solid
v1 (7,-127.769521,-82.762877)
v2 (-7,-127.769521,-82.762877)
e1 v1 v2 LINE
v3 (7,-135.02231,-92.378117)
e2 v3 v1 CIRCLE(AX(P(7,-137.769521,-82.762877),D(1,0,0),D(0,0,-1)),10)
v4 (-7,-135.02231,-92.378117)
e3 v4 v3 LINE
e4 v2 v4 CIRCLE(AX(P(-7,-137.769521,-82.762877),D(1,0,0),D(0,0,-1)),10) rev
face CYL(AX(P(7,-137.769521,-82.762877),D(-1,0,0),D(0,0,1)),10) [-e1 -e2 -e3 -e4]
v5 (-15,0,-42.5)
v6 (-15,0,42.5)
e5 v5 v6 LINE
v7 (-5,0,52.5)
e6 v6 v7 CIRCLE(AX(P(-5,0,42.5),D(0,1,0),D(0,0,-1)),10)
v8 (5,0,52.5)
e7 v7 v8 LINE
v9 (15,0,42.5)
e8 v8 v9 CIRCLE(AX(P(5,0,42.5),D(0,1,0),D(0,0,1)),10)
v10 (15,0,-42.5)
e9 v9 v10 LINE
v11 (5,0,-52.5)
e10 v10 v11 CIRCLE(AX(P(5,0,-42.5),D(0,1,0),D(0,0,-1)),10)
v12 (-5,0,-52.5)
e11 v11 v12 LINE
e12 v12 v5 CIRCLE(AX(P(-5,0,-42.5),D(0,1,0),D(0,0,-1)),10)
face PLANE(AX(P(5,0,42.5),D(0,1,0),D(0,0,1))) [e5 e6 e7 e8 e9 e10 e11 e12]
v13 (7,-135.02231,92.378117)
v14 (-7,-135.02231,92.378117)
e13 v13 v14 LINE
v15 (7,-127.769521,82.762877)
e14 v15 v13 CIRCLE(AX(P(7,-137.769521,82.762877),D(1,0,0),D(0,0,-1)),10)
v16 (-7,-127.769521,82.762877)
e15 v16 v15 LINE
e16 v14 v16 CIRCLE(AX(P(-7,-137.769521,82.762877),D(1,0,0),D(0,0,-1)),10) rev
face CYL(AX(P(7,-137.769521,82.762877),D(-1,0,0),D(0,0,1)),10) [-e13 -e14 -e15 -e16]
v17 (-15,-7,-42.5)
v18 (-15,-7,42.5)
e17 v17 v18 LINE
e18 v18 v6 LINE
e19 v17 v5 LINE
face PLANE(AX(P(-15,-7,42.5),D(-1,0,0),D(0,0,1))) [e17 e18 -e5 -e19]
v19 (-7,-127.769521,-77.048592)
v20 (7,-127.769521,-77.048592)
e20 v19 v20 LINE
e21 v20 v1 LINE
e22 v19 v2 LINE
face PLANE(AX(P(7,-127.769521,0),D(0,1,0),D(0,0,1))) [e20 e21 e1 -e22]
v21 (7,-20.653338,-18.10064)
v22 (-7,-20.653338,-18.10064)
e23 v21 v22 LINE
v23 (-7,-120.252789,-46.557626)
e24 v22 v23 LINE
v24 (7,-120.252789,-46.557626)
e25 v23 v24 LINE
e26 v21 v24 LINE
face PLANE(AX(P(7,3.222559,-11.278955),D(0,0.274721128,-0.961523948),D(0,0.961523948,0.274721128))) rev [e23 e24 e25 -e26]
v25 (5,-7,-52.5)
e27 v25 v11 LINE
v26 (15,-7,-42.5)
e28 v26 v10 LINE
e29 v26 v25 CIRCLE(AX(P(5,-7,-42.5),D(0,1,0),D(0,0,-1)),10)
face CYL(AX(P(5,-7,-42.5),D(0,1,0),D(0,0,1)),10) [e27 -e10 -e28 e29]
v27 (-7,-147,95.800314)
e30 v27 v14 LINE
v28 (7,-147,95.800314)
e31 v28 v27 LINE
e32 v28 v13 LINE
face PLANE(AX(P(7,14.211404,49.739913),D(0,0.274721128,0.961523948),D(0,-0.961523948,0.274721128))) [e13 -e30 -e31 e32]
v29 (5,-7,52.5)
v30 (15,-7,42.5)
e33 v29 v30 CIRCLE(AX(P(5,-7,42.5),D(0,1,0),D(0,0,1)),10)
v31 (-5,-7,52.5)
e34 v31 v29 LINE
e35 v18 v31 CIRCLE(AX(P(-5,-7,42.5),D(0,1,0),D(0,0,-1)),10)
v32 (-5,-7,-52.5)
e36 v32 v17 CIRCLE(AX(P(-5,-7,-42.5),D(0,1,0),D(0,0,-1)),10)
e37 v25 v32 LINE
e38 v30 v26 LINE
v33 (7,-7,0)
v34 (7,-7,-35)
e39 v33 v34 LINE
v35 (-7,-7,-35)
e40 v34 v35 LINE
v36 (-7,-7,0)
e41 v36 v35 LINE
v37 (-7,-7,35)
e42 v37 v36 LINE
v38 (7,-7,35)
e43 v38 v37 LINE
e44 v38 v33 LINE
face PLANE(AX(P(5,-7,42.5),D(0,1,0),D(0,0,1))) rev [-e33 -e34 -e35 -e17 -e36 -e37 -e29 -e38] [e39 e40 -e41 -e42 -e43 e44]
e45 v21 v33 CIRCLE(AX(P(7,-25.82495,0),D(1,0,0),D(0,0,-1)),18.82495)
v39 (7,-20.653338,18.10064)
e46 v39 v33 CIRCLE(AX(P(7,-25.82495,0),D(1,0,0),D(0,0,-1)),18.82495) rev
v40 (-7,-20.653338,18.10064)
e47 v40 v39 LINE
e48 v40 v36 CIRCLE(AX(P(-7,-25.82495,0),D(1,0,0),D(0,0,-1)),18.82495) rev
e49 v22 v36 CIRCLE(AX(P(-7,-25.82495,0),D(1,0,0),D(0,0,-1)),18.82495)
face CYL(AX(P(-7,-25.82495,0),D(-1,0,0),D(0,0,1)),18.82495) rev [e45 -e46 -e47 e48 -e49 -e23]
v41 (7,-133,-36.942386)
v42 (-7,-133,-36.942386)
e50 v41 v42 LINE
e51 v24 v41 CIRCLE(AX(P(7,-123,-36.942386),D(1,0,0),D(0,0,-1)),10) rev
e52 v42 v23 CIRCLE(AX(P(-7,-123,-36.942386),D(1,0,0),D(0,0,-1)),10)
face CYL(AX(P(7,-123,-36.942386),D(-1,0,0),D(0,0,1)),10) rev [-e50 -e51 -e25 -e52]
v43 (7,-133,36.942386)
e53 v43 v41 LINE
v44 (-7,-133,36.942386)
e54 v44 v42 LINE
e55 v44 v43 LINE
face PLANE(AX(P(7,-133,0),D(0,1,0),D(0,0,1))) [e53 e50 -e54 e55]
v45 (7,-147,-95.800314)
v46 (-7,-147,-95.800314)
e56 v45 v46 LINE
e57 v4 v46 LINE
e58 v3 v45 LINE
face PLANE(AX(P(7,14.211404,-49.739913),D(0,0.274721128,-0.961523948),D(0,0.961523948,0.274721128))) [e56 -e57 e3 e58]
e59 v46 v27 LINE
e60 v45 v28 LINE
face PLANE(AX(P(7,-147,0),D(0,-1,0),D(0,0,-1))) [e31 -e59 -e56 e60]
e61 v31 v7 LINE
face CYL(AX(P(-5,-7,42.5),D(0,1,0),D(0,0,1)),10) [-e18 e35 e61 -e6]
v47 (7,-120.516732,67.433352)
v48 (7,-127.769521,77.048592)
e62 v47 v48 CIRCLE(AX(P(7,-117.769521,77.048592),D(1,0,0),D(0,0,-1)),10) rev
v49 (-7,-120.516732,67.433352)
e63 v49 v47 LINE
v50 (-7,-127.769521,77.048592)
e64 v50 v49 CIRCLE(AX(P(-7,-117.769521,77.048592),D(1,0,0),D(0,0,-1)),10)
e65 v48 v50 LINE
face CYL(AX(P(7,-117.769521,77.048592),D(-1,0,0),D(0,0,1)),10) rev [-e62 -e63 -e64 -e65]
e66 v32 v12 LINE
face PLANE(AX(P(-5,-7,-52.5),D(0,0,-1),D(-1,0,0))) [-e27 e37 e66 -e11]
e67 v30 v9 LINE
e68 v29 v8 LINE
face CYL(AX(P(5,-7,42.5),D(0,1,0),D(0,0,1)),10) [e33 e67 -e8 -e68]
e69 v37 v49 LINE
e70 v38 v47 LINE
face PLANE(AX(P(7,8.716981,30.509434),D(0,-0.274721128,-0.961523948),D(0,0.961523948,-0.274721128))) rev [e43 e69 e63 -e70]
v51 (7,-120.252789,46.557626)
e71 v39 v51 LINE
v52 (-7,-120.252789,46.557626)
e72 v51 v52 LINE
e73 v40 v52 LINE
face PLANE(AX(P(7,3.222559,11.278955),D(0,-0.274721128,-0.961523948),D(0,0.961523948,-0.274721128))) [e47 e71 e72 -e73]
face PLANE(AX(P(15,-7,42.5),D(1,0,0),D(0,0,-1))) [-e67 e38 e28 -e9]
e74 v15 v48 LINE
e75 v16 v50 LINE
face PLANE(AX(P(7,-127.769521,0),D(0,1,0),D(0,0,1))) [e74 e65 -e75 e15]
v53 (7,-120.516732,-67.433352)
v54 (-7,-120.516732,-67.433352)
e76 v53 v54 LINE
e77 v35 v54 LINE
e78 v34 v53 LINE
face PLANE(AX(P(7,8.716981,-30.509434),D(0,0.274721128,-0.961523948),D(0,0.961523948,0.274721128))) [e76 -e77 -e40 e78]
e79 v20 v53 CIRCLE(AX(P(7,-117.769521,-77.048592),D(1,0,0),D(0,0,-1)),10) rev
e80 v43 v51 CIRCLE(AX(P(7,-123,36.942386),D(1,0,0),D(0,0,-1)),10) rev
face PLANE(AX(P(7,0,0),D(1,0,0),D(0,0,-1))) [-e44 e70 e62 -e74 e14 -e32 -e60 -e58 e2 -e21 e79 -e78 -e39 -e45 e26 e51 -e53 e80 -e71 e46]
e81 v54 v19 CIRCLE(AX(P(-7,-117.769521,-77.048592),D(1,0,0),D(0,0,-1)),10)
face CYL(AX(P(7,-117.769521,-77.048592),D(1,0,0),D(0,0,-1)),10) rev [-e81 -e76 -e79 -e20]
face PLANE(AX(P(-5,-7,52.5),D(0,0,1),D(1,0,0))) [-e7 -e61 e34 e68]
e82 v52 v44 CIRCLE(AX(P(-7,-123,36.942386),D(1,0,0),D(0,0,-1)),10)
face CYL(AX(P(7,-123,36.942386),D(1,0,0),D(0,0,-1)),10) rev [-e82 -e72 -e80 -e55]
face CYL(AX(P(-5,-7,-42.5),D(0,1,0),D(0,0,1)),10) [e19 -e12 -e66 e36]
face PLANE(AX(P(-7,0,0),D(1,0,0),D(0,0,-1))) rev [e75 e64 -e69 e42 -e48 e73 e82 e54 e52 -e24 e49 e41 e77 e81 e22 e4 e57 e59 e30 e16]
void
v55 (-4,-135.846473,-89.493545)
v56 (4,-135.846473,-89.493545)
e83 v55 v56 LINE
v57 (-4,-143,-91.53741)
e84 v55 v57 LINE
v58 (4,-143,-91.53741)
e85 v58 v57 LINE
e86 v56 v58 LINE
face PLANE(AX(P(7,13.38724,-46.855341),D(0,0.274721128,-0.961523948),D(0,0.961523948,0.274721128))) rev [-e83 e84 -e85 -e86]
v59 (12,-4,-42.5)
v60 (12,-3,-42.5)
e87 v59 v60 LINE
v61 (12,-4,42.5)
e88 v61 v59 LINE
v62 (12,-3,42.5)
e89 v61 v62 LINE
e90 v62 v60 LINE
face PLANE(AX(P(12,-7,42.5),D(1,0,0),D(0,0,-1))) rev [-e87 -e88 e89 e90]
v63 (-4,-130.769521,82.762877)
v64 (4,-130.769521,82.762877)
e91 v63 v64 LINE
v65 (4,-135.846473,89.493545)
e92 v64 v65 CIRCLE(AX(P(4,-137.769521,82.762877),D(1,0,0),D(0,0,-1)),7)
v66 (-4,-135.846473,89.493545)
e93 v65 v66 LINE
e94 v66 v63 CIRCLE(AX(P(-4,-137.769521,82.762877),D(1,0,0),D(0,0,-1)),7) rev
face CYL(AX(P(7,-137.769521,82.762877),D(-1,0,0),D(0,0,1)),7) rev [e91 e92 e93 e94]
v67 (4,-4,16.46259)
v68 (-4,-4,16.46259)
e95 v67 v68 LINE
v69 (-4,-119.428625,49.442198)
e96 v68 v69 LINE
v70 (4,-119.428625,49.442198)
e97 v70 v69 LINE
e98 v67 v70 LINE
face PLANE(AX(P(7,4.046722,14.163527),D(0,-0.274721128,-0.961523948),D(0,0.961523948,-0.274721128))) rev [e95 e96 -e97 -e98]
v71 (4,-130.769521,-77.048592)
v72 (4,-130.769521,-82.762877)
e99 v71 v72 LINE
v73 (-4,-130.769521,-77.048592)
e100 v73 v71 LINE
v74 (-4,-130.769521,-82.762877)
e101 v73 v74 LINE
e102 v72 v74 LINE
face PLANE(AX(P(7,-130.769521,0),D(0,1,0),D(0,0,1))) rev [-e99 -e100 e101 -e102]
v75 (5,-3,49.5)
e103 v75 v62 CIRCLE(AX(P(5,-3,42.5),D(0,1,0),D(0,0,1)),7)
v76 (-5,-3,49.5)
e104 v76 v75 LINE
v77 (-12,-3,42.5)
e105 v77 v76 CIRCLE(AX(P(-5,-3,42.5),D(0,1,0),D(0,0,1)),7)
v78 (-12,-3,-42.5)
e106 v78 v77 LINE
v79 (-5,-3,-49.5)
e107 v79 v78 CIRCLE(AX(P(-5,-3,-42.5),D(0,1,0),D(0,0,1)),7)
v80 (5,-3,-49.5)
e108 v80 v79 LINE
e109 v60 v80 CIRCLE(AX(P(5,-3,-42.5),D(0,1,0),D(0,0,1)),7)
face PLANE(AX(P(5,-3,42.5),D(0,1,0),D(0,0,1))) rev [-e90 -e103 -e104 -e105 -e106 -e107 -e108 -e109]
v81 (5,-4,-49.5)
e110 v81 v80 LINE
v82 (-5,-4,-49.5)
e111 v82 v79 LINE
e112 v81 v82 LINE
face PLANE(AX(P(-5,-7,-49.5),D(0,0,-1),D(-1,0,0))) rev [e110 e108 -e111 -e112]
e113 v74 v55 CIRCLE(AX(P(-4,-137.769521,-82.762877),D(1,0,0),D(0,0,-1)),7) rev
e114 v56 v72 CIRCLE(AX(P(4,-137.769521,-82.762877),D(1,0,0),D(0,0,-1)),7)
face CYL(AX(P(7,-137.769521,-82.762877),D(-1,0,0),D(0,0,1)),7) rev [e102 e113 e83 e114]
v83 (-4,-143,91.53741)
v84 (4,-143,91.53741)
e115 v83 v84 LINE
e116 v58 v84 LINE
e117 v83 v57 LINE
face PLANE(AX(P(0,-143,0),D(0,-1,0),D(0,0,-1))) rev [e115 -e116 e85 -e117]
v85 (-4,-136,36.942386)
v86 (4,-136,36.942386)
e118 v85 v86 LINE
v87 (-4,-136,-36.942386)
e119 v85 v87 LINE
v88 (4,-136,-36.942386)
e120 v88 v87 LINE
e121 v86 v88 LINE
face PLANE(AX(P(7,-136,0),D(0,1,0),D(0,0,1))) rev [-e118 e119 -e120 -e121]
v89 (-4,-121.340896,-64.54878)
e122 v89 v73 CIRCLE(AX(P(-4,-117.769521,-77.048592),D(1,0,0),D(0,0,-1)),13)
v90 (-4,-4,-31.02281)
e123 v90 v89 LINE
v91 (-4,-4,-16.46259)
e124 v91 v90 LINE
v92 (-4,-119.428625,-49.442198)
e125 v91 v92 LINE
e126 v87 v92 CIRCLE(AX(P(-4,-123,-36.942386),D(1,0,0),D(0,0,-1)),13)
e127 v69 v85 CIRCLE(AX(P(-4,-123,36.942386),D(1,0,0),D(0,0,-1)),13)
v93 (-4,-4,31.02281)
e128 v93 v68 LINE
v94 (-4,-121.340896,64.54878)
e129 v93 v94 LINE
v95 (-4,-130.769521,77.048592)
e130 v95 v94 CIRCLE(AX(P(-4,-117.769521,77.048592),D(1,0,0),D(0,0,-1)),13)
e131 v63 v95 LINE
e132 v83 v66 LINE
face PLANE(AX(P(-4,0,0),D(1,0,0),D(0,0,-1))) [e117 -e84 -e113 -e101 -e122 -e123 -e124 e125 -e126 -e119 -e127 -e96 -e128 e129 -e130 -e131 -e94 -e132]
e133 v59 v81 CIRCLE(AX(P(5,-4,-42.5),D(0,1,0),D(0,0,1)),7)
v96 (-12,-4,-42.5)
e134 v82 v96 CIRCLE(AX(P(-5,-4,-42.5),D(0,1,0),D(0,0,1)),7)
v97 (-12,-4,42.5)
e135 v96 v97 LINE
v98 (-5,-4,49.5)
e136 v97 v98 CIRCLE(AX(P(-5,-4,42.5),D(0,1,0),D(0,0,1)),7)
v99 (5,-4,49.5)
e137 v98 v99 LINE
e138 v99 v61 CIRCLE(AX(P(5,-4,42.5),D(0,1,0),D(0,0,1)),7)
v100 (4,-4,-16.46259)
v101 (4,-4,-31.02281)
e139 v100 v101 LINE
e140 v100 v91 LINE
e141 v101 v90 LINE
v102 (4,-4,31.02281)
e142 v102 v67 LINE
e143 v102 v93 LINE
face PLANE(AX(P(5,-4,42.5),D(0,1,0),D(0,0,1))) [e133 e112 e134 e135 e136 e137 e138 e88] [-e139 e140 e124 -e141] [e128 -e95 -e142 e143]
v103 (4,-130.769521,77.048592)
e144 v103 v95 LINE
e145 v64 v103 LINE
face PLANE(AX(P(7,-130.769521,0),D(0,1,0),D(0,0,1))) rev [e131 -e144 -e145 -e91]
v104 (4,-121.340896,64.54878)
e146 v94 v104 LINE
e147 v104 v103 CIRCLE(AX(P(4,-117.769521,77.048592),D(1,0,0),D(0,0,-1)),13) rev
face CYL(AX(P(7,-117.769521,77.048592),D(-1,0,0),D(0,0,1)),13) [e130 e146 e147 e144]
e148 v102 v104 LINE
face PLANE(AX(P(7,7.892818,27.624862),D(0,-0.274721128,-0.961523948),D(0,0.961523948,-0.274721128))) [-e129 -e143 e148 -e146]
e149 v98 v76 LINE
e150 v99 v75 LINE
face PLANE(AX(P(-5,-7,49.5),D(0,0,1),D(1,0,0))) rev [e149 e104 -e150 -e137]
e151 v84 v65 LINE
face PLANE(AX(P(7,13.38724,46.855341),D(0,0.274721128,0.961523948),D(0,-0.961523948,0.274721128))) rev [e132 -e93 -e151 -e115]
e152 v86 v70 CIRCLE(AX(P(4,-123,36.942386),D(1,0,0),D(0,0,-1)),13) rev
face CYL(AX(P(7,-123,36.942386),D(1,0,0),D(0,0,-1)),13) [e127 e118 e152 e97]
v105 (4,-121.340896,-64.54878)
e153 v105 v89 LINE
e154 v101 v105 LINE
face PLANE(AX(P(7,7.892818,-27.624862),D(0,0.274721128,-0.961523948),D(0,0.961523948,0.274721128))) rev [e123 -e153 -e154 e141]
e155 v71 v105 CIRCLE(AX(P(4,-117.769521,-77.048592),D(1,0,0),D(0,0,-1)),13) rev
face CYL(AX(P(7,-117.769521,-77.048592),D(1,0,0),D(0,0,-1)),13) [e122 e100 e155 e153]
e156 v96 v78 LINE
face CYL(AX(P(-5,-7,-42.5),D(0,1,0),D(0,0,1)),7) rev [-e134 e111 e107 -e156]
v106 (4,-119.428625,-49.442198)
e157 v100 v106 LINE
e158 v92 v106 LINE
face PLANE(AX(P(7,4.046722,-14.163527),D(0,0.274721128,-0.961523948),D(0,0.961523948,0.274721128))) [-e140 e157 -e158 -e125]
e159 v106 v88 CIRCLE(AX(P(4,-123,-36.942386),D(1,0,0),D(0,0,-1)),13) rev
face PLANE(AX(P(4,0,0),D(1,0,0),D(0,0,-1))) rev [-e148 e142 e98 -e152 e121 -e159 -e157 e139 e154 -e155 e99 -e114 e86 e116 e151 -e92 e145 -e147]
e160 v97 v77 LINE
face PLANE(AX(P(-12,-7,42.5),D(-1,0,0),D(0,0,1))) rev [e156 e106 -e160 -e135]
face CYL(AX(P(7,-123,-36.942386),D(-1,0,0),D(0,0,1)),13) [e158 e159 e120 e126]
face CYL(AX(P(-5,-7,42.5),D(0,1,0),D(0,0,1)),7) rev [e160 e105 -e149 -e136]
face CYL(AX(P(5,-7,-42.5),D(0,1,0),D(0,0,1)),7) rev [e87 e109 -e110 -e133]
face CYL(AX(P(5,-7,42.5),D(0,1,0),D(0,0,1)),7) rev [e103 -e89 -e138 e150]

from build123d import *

# Parameters (mm, degrees)
BOSS_EXTRUDE3_DEPTH = 7
BOSS_EXTRUDE4_DEPTH = 7
FILLET2_R           = 10
SHELL8_START        = -4
SHELL8_DEPTH        = 8
SHELL8_START_2      = -5
SHELL8_2_OUTLINE_W  = 1
SHELL8_2_OUTLINE_H  = 99
SHELL8_2_DEPTH      = 10
SHELL8_3_DEPTH      = 1
SKETCH14_W          = 8
SKETCH14_H          = 185.360533748
BOSS_EXTRUDE5_DEPTH = 4
FILLET5_R           = 18.82495


with BuildPart() as part:
    # Sketch10 → Boss-Extrude3 (new body)
    with BuildSketch(Plane(origin=(0, 0, 0), x_dir=(1, 0, 0), z_dir=(0, 1, 0))):
        with BuildLine():
            Line((-5, -52.5), (5, -52.5))
            ThreePointArc((5, -52.5), (12.071067812, -49.571067812), (15, -42.5))
            Line((15, -42.5), (15, 42.5))
            ThreePointArc((15, 42.5), (12.071067812, 49.571067812), (5, 52.5))
            Line((5, 52.5), (-5, 52.5))
            ThreePointArc((-5, 52.5), (-12.071067812, 49.571067812), (-15, 42.5))
            Line((-15, 42.5), (-15, -42.5))
            ThreePointArc((-15, -42.5), (-12.071067812, -49.571067812), (-5, -52.5))
        make_face()
    extrude(amount=-BOSS_EXTRUDE3_DEPTH)

    # Sketch11 → Boss-Extrude4 (add, symmetric)
    with BuildSketch(Plane(origin=(0, 0, 0), x_dir=(0, 0, -1), z_dir=(1, 0, 0))):
        Polygon((-71, -133), (-69.505577442, -127.769521047), (-90.305891411, -127.769521047), (-95.800313969, -147), (-75, -147), align=None)
        Polygon((0, -133), (-50.199686031, -133), (-71, -133), (-75, -147), (0, -147), align=None)
        Polygon((50.199686031, -133), (0, -133), (0, -147), (75, -147), (71, -133), align=None)
        Polygon((-14.199686031, -7), (-35, -7), (-69.505577442, -127.769521047), (-71, -133), (-50.199686031, -133), align=None)
        Polygon((35, -7), (14.199686031, -7), (50.199686031, -133), (71, -133), (69.505577442, -127.769521047), align=None)
        Polygon((90.305891411, -127.769521047), (69.505577442, -127.769521047), (71, -133), (75, -147), (95.800313969, -147), align=None)
    extrude(amount=BOSS_EXTRUDE4_DEPTH, both=True)

    # Fillet2
    fillet2_edges = [part.edges().sort_by_distance(p)[0] for p in [
        (0, -133, -50.199686031),
        (0, -133, 50.199686031),
        (0, -127.769521047, 69.505577442),
        (0, -127.769521047, 90.305891411),
        (0, -127.769521047, -90.305891411),
        (0, -127.769521047, -69.505577442),
    ]]
    fillet(fillet2_edges, radius=FILLET2_R)

    # Shell8: read off the stored shape, not the designer's step
    # Shell8 outline → Shell8 (cut)
    with BuildSketch(Plane.YZ.offset(SHELL8_START)):
        with BuildLine():
            Line((-3, -49.5), (-3, 49.5))
            Line((-3, 49.5), (-4, 49.5))
            Line((-4, 49.5), (-4, 31.022810047))
            Line((-4, 31.022810047), (-121.34089571, 64.54878025))
            ThreePointArc((-121.34089571, 64.54878025), (-128.148053473, 69.220049899), (-130.769521047, 77.04859157))
            Line((-130.769521047, 77.04859157), (-130.769521047, 82.762877284))
            ThreePointArc((-130.769521047, 82.762877284), (-132.18108051, 86.978245876), (-135.846473152, 89.493544917))
            Line((-135.846473152, 89.493544917), (-147, 92.680266874))
            Line((-147, 92.680266874), (-147, -92.680266874))
            Line((-147, -92.680266874), (-135.846473152, -89.493544917))
            ThreePointArc((-135.846473152, -89.493544917), (-132.18108051, -86.978245876), (-130.769521047, -82.762877284))
            Line((-130.769521047, -82.762877284), (-130.769521047, -77.04859157))
            ThreePointArc((-130.769521047, -77.04859157), (-128.148053473, -69.220049899), (-121.34089571, -64.54878025))
            Line((-121.34089571, -64.54878025), (-4, -31.022810047))
            Line((-4, -31.022810047), (-4, -49.5))
            Line((-4, -49.5), (-3, -49.5))
        make_face()
        with BuildLine():
            Line((-4, 16.462590269), (-4, -16.462590269))
            Line((-4, -16.462590269), (-119.428625337, -49.442197508))
            ThreePointArc((-119.428625337, -49.442197508), (-130.828541671, -47.320918614), (-136, -36.942386189))
            Line((-136, -36.942386189), (-136, 36.942386189))
            ThreePointArc((-136, 36.942386189), (-130.828541671, 47.320918614), (-119.428625337, 49.442197508))
            Line((-119.428625337, 49.442197508), (-4, 16.462590269))
        make_face(mode=Mode.SUBTRACT)
    extrude(amount=SHELL8_DEPTH, mode=Mode.SUBTRACT)

    # Shell8 2 outline → Shell8 2 (cut)
    with BuildSketch(Plane.YZ.offset(SHELL8_START_2)):
        with Locations((-3.5, 0)):
            Rectangle(SHELL8_2_OUTLINE_W, SHELL8_2_OUTLINE_H)
    extrude(amount=SHELL8_2_DEPTH, mode=Mode.SUBTRACT)

    # Shell8 3 outline → Shell8 3 (cut)
    with BuildSketch(Plane(origin=(0, 0, 0), x_dir=(1, 0, 0), z_dir=(0, 1, 0)).offset(SHELL8_START)):
        with BuildLine():
            Line((5, 49.5), (5, -49.5))
            ThreePointArc((5, -49.5), (9.949747468, -47.449747468), (12, -42.5))
            Line((12, -42.5), (12, 42.5))
            ThreePointArc((12, 42.5), (9.949747468, 47.449747468), (5, 49.5))
        make_face()
        with BuildLine():
            Line((-12, 42.5), (-12, -42.5))
            ThreePointArc((-12, -42.5), (-9.949747468, -47.449747468), (-5, -49.5))
            Line((-5, -49.5), (-5, 49.5))
            ThreePointArc((-5, 49.5), (-9.949747468, 47.449747468), (-12, 42.5))
        make_face()
    extrude(amount=SHELL8_3_DEPTH, mode=Mode.SUBTRACT)

    # Sketch14 → Boss-Extrude5 (add)
    with BuildSketch(Plane.XZ.offset(147)):
        Rectangle(SKETCH14_W, SKETCH14_H)
    extrude(amount=-BOSS_EXTRUDE5_DEPTH)

    # Fillet5
    fillet5_edges = [part.edges().sort_by_distance(p)[0] for p in [
        (0, -7, 14.199686031),
        (0, -7, -14.199686031),
    ]]
    fillet(fillet5_edges, radius=FILLET5_R - 0.0001)  # a hair under: the kernel refuses the full size


solid = part.part
